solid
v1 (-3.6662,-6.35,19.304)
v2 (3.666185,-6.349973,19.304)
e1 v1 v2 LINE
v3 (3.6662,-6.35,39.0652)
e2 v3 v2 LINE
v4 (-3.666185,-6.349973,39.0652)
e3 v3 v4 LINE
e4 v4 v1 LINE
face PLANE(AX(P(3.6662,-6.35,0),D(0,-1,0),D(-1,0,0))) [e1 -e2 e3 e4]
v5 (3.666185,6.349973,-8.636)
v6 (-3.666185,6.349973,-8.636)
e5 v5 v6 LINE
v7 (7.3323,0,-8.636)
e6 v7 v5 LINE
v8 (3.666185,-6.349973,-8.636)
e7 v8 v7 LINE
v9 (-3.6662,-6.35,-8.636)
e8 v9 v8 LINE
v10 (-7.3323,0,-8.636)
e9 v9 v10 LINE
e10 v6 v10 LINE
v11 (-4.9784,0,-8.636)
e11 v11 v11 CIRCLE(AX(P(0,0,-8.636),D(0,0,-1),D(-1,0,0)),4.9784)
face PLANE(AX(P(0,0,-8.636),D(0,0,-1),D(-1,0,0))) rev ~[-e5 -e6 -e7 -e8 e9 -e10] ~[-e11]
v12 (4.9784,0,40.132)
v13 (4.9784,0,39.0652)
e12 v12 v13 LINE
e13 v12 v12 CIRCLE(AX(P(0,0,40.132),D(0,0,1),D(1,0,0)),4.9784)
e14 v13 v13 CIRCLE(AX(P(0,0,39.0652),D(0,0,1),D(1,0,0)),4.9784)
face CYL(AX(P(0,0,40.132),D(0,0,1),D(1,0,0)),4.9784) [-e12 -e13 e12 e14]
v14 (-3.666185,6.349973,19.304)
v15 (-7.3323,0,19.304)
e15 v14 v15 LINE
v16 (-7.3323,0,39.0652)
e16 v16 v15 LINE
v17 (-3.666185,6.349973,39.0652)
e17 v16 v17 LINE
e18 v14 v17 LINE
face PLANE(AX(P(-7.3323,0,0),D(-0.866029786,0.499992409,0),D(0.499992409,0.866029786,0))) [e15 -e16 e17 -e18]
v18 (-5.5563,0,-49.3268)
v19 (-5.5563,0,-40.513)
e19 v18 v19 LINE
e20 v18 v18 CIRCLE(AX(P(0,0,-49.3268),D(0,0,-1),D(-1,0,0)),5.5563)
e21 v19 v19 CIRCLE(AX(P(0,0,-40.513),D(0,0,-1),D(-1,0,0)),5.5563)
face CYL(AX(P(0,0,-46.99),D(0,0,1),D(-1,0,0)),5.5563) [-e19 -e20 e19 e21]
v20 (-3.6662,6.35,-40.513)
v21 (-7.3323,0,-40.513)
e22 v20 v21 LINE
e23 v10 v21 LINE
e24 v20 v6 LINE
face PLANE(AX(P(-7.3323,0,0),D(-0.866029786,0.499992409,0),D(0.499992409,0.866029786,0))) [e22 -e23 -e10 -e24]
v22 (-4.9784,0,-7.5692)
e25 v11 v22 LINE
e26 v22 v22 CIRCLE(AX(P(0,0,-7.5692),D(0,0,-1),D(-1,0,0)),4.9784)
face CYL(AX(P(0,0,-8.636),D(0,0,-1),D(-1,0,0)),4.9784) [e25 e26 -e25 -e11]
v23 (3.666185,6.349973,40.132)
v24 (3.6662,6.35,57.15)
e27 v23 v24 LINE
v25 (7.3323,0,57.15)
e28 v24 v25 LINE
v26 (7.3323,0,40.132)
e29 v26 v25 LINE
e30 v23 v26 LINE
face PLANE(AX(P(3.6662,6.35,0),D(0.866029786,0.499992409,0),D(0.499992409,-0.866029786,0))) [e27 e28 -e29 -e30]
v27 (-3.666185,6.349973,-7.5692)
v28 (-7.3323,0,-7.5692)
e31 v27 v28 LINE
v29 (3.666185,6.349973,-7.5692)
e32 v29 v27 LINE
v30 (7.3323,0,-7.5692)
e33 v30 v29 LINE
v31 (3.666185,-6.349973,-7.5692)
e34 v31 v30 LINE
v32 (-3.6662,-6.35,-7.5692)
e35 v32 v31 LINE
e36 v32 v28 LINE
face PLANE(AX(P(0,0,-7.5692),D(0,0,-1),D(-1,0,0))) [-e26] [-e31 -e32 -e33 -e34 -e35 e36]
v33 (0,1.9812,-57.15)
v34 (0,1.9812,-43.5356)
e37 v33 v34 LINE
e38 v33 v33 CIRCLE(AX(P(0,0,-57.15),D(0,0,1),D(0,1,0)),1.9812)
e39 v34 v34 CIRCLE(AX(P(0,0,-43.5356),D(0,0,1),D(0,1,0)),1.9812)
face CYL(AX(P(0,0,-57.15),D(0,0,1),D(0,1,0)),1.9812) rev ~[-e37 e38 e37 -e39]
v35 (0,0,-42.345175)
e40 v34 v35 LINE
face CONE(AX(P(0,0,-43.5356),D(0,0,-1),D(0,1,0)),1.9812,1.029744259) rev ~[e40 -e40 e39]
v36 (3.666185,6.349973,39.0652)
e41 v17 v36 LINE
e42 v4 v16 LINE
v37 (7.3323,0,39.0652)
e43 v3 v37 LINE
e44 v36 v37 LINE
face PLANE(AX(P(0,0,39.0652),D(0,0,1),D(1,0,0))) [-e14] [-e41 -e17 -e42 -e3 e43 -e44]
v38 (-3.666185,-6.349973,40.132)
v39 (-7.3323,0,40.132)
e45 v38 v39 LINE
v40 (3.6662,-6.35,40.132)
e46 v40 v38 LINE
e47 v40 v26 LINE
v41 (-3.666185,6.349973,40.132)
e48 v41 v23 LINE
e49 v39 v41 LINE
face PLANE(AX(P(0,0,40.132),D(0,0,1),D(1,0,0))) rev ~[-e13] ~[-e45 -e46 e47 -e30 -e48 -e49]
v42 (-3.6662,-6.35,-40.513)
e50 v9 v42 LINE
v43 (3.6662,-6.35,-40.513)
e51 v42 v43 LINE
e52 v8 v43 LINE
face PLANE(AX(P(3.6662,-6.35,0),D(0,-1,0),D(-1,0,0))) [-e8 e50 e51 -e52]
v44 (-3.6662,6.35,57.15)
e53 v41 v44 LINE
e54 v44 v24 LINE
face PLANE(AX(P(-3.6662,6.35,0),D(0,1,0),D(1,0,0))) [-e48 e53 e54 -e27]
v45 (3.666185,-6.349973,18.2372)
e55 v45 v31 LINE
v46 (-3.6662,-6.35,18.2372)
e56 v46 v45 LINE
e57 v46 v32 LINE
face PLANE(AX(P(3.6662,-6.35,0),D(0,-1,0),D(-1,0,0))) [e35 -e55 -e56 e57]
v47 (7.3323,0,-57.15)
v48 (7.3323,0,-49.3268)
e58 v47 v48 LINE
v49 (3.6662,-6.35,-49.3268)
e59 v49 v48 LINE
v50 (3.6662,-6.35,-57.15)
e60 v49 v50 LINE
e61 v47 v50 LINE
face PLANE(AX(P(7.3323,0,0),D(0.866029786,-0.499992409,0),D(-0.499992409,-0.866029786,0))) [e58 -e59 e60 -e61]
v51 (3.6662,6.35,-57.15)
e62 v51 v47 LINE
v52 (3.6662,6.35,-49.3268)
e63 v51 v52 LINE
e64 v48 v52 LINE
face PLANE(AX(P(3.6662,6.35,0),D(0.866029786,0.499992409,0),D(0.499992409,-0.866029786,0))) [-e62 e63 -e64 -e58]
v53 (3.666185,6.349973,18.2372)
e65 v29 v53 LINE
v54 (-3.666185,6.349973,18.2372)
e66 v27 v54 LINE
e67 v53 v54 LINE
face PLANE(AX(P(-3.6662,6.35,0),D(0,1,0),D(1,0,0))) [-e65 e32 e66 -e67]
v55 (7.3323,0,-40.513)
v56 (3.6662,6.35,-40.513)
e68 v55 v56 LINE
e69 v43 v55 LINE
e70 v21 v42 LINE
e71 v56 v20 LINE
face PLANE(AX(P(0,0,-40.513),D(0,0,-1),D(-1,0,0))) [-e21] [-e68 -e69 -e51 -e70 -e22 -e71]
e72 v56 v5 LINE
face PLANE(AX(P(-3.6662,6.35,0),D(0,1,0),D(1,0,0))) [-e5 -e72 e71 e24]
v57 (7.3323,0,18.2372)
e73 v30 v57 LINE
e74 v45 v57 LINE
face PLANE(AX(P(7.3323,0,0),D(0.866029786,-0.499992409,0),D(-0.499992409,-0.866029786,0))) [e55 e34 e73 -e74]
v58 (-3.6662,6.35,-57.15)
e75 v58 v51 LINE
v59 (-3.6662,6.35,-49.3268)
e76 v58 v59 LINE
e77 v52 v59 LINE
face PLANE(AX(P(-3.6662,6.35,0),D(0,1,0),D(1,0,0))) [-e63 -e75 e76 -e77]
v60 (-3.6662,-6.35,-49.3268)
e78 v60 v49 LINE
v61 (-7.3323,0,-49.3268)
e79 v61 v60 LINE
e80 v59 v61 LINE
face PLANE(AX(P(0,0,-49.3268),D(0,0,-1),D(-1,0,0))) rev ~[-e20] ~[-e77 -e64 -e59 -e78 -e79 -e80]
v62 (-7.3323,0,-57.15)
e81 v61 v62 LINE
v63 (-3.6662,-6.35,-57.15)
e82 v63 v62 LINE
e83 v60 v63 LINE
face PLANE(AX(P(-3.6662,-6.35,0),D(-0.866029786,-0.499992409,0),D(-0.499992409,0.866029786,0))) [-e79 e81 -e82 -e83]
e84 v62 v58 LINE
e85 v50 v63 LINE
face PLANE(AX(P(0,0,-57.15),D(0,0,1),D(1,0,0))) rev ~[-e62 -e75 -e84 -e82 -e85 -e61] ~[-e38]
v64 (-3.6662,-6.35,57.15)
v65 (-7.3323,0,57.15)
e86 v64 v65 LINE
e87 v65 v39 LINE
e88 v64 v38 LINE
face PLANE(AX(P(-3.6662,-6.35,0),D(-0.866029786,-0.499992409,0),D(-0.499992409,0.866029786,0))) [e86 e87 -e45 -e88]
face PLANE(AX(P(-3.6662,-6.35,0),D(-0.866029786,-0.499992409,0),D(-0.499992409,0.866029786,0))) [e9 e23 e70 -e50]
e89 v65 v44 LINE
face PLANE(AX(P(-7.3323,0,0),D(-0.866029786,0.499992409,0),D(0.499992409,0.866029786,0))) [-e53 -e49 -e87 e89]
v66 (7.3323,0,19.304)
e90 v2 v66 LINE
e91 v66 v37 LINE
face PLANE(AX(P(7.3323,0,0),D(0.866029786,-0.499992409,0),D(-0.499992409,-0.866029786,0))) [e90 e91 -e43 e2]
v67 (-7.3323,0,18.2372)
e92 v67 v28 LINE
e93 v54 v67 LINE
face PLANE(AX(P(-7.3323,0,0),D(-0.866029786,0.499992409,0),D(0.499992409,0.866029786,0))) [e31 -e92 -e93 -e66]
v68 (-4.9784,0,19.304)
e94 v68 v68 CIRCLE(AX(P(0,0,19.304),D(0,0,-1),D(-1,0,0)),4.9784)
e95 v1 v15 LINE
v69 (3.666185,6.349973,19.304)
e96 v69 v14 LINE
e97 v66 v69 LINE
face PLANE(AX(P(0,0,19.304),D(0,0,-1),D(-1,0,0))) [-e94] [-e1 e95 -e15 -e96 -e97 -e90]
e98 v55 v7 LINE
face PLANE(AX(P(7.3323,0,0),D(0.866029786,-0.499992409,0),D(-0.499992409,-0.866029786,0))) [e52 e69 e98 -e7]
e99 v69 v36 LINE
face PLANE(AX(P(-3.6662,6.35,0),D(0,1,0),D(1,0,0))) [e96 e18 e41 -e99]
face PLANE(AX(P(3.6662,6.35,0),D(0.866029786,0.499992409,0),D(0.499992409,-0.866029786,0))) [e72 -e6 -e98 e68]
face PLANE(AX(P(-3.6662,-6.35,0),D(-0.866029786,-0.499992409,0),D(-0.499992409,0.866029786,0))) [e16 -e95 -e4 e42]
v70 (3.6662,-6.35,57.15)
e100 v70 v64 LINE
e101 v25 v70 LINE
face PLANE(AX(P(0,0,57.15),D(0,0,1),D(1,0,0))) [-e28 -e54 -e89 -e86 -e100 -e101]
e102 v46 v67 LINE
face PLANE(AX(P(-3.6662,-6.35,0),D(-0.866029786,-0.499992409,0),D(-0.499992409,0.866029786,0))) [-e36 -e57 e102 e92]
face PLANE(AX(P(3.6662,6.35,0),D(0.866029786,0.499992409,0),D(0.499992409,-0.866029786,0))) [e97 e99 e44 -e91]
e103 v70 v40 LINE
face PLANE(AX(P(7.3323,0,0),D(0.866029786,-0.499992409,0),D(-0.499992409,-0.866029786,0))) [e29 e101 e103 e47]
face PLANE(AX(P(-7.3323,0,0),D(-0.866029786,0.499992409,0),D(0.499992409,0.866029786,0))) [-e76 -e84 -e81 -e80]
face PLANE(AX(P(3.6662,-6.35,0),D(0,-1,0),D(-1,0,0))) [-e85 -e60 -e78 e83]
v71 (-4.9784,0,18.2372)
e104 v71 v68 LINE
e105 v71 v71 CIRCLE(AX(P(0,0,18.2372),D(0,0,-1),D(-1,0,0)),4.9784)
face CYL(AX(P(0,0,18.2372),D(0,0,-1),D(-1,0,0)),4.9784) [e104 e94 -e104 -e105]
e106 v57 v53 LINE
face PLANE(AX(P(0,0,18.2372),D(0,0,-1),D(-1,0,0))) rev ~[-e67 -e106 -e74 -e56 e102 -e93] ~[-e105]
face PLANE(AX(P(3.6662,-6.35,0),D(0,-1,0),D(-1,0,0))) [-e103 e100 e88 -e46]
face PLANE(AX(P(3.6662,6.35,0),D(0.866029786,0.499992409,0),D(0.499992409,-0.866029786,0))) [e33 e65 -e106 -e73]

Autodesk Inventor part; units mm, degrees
sketch "Sketch1" plane through (0, 0, 0) normal (0, 0, 1) x (1, 0, 0)
  line L0 (7.3323, 0) -> (3.6662, -6.35)
  line L1 (3.6662, -6.35) -> (-3.6662, -6.35)
  line L2 (-3.6662, -6.35) -> (-7.3323, 0)
  line L3 (-7.3323, 0) -> (-3.6662, 6.35)
  line L4 (-3.6662, 6.35) -> (3.6662, 6.35)
  line L5 (3.6662, 6.35) -> (7.3323, 0)
  point P0 (0, 0)
  point P1 (0, 0)
  dimension "d0" = 12.7
extrude "Extrusion1" add sketch "Sketch1" along normal mid plane 114.3
sketch "Sketch10" plane through (0, 0, -57.15) normal (0, 0, -1) x (-1, 0, 0)
  point P0 (0, 0)
  point P1 (0, 0)
hole "Hole3" at (0, 0, -57.15) direction (0, 0, 1) diameter 3.9624 depth 13.6144 tip angle 118 thread size "10-32 UNF" class "2B" standard "ANSI Unified Screw Threads"
ref_plane "Work Plane4" through (0, 0, -46.99) normal (0, 0, -1) x (-1, 0, 0)
ref_plane "Work Plane5" through (0, 0, -8.636) normal (0, 0, -1) x (-1, 0, 0)
ref_plane "Work Plane6" through (0, 0, 18.2372) normal (0, 0, -1) x (-1, 0, 0)
sketch "Sketch13" plane through (0, 0, 18.2372) normal (0, 0, -1) x (-1, 0, 0)
  circle A0 centre (0, 0) radius 1.9812
  circle A1 centre (0, 0) radius 4.9784
  line L0 (3.6662, -6.35) -> (7.3323, 0)
  circle A2 centre (0, 0) radius 7.3323
  dimension "d51" = 9.9568
extrude "Extrusion7" cut sketch "Sketch13" against normal blind 1.0668 contours A2 L0 | L0 A2
ref_plane "Work Plane7" through (0, 0, 40.132) normal (0, 0, 1) x (1, 0, 0)
sketch "Sketch15" plane through (0, 0, 40.132) normal (0, 0, 1) x (1, 0, 0)
  circle A0 centre (0, 0) radius 1.9812
  circle A1 centre (0, 0) radius 4.9784
  line L0 (3.6662, -6.35) -> (7.3323, 0)
  circle A2 centre (0, 0) radius 7.3323
  dimension "d60" = 9.9568
extrude "Extrusion9" cut sketch "Sketch15" against normal blind 1.0668 contours A2 L0 | L0 A2
sketch "Sketch16" plane through (0, 0, 39.0652) normal (0, 0, 1) x (1, 0, 0)
  point P0 (0, 0)
sketch "Sketch17" plane through (0, 0, -46.99) normal (0, 0, -1) x (-1, 0, 0)
  circle A0 centre (0, 0) radius 1.9812 projected
  circle A1 centre (0, 0) radius 5.5563
  line L0 (-3.6662, 6.35) -> (3.6662, 6.35) projected
  line L1 (3.6662, 6.35) -> (7.3323, 0) projected
  line L2 (7.3323, 0) -> (3.6662, -6.35) projected
  line L3 (3.6662, -6.35) -> (-3.6662, -6.35) projected
  line L4 (-3.6662, -6.35) -> (-7.3323, 0) projected
  line L5 (-7.3323, 0) -> (-3.6662, 6.35) projected
  dimension "d64" = 11.1125
extrude "Extrusion10" cut sketch "Sketch17" along normal blind 2.3368 and the other way blind 6.477 contours L0 L1 L2 L3 L4 L5
sketch "Sketch18" plane through (0, 0, -8.636) normal (0, 0, -1) x (-1, 0, 0)
  circle A0 centre (0, 0) radius 1.9812
  circle A1 centre (0, 0) radius 4.9784
  line L0 (3.6662, -6.35) -> (7.3323, 0)
  circle A2 centre (0, 0) radius 7.3323
  dimension "d69" = 9.9568
extrude "Extrusion11" cut sketch "Sketch18" against normal blind 1.0668 contours A2 L0 | L0 A2
properties part number "Ch-1-01-0.5x4.5HexShaft" material "Steel, Alloy"
